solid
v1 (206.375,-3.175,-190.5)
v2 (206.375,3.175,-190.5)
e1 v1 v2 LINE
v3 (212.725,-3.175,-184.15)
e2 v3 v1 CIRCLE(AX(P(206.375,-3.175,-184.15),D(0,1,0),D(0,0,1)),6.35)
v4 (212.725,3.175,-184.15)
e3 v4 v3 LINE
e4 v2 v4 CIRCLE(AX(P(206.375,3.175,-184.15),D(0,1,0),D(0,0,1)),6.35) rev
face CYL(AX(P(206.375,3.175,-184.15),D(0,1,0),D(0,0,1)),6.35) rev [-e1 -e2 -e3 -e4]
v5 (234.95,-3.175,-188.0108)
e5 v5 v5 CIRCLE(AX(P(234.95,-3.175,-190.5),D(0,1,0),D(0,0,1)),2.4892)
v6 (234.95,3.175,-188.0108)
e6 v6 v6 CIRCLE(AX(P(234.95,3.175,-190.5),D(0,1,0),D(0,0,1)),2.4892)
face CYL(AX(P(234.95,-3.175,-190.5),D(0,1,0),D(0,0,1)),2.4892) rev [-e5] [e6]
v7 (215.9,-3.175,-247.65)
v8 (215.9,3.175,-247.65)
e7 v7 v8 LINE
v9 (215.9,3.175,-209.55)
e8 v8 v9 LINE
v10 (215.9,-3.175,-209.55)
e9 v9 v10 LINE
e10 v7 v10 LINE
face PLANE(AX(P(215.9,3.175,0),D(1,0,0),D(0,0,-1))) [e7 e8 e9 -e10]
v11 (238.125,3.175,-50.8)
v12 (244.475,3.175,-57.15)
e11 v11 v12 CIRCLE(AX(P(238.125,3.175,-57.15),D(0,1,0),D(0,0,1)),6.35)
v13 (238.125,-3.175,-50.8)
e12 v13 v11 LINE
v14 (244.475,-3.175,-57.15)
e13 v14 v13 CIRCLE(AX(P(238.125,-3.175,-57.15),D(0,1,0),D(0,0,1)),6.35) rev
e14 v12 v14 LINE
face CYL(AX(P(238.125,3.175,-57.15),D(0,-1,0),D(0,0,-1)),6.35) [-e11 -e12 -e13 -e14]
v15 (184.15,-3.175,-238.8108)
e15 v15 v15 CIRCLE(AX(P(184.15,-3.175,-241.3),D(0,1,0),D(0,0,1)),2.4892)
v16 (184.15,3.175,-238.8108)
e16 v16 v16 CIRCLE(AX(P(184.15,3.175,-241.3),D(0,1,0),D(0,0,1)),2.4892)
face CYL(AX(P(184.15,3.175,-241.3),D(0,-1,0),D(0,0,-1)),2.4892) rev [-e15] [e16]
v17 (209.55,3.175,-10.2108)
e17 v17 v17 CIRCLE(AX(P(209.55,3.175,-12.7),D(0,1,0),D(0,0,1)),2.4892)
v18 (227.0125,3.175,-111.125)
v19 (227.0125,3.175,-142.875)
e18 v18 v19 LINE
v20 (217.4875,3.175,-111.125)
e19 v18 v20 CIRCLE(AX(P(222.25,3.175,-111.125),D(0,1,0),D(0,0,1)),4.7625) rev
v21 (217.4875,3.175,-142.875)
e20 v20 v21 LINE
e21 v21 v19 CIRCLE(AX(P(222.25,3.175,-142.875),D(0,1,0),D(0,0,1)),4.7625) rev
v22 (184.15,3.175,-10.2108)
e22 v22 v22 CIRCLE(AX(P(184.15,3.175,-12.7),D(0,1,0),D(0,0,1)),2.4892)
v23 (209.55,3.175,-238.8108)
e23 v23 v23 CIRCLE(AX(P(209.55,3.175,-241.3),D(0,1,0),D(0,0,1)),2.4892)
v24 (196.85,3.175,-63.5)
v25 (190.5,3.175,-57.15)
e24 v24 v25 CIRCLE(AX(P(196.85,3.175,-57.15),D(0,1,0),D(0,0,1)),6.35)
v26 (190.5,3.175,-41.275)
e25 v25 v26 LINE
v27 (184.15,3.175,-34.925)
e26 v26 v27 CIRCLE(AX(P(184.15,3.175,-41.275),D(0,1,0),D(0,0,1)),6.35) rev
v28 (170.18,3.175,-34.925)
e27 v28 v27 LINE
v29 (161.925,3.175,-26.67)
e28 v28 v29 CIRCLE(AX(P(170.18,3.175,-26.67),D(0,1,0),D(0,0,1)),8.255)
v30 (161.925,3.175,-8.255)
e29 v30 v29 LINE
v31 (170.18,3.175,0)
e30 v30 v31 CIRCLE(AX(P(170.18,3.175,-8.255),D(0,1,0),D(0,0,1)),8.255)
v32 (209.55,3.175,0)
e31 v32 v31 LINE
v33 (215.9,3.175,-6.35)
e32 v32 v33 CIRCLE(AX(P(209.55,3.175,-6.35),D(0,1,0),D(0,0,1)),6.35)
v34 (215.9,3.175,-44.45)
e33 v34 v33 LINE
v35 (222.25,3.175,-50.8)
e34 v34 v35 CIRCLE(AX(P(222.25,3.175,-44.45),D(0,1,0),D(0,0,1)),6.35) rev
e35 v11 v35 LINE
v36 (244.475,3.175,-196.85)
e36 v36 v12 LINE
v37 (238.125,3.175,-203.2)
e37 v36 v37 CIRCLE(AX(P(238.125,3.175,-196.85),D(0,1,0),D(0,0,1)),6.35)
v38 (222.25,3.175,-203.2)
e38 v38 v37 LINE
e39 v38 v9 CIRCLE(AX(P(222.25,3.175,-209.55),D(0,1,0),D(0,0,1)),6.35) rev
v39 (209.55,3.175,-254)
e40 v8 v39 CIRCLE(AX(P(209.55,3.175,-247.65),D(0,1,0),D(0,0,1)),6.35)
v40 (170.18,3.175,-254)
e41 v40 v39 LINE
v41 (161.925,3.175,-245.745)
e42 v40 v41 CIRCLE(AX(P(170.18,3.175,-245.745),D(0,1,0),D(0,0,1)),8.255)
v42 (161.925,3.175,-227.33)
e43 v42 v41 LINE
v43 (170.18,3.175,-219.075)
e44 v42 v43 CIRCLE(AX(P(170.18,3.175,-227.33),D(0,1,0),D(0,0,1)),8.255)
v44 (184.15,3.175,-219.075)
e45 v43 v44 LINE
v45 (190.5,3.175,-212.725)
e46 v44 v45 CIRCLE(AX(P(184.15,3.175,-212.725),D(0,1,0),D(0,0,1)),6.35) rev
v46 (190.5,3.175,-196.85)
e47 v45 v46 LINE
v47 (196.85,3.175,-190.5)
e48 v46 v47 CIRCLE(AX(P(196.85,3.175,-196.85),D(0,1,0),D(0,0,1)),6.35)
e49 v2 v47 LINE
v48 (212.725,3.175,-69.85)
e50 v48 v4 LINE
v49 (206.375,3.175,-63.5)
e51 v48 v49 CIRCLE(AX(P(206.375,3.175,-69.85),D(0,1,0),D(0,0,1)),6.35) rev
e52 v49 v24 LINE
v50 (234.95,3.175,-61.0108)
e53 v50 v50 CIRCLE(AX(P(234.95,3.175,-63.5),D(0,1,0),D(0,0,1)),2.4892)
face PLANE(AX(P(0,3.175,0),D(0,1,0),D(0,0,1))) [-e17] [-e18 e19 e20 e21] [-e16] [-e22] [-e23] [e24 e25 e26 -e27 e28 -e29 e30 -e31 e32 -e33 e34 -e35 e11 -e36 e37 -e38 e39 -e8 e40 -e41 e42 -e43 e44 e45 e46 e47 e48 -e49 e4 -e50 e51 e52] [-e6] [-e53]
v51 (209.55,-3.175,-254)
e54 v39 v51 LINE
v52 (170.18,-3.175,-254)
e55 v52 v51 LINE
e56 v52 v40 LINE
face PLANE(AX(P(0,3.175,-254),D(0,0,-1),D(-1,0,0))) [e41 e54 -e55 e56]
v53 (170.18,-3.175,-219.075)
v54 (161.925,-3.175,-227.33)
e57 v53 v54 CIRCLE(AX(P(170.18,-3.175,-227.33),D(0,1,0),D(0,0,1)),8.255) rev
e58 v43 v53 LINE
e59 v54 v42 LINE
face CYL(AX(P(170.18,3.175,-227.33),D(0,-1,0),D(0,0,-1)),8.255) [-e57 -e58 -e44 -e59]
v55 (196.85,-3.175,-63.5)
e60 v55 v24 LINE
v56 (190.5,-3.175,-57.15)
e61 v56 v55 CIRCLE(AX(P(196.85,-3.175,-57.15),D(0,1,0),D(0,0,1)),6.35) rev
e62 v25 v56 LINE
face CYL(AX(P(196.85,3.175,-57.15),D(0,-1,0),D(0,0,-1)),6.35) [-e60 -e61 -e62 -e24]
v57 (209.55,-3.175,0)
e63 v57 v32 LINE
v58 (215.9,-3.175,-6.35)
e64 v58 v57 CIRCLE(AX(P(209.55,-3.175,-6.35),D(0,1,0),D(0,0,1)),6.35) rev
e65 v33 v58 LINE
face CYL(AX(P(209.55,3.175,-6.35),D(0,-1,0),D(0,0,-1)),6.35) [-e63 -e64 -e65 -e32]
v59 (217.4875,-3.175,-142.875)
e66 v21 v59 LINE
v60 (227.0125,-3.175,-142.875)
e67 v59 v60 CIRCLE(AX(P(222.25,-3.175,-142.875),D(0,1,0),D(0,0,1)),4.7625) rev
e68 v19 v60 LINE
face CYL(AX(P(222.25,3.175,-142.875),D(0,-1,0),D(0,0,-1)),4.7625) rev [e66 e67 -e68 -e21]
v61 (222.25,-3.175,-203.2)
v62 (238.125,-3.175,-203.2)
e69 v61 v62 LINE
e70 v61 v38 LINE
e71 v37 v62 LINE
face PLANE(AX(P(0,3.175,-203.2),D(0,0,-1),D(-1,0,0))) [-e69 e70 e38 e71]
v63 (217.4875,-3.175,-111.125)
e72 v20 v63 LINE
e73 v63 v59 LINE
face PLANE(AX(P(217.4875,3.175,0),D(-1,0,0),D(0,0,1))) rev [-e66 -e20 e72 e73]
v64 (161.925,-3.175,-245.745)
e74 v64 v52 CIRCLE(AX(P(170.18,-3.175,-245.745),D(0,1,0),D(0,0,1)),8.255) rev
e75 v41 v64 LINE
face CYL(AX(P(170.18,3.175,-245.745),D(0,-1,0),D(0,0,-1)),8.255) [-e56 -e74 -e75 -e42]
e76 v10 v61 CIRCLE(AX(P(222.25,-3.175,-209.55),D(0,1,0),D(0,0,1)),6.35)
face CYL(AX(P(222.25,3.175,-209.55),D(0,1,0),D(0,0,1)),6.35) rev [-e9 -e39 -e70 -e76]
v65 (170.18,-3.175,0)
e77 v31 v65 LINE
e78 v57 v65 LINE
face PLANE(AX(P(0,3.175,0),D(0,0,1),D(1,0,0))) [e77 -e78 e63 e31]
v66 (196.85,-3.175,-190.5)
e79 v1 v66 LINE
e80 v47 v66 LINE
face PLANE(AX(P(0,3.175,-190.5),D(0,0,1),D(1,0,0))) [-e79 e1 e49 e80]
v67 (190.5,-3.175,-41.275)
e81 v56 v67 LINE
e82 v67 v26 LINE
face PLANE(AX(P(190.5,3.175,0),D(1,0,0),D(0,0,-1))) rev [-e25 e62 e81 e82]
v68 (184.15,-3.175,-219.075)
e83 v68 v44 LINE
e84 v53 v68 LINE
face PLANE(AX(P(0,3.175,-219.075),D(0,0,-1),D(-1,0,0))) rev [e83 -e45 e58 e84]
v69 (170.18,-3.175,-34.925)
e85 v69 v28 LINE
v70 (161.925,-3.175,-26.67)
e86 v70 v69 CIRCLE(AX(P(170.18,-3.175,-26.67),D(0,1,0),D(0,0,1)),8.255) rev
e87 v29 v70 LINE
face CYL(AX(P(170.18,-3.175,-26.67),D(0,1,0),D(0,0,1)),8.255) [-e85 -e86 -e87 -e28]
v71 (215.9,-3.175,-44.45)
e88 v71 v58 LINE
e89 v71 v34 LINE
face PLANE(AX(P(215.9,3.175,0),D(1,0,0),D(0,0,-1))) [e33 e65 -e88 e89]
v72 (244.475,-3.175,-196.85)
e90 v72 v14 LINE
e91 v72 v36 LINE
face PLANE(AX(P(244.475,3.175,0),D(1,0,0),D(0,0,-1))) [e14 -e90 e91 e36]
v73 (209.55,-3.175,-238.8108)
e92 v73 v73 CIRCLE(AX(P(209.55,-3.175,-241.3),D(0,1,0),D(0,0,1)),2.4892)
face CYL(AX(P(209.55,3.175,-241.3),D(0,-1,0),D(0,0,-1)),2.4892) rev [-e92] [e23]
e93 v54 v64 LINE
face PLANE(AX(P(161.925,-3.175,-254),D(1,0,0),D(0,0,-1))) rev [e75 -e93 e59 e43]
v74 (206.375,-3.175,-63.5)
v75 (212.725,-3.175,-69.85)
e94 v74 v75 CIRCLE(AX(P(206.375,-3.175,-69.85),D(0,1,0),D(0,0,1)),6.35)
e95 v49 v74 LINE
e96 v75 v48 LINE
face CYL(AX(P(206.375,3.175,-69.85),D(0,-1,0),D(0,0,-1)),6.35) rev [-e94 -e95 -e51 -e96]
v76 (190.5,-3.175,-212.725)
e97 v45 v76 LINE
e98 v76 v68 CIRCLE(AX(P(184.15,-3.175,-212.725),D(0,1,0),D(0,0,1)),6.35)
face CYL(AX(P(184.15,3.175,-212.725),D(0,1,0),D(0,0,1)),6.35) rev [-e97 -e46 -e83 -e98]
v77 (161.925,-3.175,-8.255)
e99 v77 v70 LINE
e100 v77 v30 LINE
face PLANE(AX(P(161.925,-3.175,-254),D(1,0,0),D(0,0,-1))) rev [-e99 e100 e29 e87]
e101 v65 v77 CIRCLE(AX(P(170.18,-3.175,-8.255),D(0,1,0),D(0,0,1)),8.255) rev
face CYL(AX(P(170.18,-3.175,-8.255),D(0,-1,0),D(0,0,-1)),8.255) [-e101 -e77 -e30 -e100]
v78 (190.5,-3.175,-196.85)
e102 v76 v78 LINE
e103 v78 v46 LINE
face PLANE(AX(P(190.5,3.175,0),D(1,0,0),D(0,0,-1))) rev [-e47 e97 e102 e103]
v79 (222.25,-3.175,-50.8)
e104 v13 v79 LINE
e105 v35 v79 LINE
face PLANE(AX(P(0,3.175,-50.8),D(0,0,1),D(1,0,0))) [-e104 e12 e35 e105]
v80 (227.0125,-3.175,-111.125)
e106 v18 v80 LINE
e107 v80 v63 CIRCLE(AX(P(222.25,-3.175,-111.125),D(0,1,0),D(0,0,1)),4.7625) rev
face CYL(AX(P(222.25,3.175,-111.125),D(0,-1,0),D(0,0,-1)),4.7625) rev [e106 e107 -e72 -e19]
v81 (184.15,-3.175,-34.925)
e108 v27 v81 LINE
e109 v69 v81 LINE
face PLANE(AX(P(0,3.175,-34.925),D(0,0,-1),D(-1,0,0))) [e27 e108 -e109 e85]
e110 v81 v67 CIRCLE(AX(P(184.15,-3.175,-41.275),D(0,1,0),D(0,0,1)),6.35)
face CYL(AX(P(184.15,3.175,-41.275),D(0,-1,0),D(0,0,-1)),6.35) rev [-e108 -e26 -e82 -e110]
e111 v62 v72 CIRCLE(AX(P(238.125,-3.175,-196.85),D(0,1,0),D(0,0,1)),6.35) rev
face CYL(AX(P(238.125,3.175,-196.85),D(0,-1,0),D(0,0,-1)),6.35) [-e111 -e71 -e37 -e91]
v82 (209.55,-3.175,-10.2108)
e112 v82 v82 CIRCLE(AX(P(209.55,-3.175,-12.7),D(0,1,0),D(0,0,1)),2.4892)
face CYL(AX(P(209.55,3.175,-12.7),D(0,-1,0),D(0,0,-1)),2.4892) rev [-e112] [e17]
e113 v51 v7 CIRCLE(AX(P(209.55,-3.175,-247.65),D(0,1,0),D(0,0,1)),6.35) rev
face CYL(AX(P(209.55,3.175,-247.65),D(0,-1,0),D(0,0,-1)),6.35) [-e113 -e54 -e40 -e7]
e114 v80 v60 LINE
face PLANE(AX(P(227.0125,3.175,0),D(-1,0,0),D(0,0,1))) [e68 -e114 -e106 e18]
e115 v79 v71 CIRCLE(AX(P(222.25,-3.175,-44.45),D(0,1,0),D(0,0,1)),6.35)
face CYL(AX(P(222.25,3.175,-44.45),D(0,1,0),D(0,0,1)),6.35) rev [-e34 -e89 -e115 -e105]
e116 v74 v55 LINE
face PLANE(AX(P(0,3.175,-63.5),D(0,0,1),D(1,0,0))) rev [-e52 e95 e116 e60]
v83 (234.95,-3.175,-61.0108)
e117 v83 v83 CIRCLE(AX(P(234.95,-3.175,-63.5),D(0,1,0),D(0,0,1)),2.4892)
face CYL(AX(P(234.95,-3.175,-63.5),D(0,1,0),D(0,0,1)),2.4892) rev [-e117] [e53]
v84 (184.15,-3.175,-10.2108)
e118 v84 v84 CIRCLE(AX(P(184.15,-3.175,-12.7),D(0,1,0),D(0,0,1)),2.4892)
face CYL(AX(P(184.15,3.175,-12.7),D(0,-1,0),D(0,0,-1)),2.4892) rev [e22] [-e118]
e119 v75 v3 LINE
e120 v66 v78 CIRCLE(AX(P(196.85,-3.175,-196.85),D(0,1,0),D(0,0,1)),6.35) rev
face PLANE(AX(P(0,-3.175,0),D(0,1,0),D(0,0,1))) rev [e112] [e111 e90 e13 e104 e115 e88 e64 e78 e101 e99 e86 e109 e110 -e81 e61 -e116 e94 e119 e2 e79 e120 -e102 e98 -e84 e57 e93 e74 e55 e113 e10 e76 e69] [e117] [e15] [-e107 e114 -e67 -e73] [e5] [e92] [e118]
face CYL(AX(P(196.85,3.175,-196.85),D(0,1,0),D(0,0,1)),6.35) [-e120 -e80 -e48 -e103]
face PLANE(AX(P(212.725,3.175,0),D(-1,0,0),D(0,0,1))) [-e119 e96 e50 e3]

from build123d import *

# Parameters (mm, degrees)
SKETCH1_R           = 2.4892
BOSS_EXTRUDE1_DEPTH = 3.175
FILLET1_R           = 6.35
LPATTERN1_START     = -3.175
LPATTERN1_OUTLINE_R = 2.4892
LPATTERN1_DEPTH     = 6.35
SKETCH2_R           = 2.4892
SKETCH2_W           = 190.5
SKETCH2_H           = 254
CUT_EXTRUDE1_DEPTH  = 353.596579854
FILLET2_R           = 8.255


# Read off the part's stored shape, not the designer's step: LPattern1
with BuildPart() as part:
    # Sketch1 → Boss-Extrude1 (new, symmetric)
    with BuildSketch(Plane(origin=(0, 0, 0), x_dir=(1, 0, 0), z_dir=(0, 1, 0))):
        Polygon((0, 50.8), (0, 0), (215.9, 0), (215.9, 50.8), (244.475, 50.8), (244.475, 203.2), (215.9, 203.2), (215.9, 254), (0, 254), (0, 203.2), (-28.575, 203.2), (-28.575, 50.8), align=None)
        Polygon((12.7, 190.5), (12.7, 219.075), (190.5, 219.075), (190.5, 190.5), (212.725, 190.5), (212.725, 63.5), (190.5, 63.5), (190.5, 34.925), (12.7, 34.925), (12.7, 63.5), (-9.525, 63.5), (-9.525, 190.5), align=None, mode=Mode.SUBTRACT)
        with Locations(Location((209.55, 12.7, 0), (0, 0, 270))):
            Circle(SKETCH1_R, mode=Mode.SUBTRACT)
        with BuildLine():
            Line((227.0125, 142.875), (227.0125, 111.125))
            ThreePointArc((227.0125, 111.125), (222.25, 106.3625), (217.4875, 111.125))
            Line((217.4875, 111.125), (217.4875, 142.875))
            ThreePointArc((217.4875, 142.875), (222.25, 147.6375), (227.0125, 142.875))
        make_face(mode=Mode.SUBTRACT)
        with BuildLine():
            ThreePointArc((-14.2875, 111.125), (-19.05, 106.3625), (-23.8125, 111.125))
            Line((-23.8125, 111.125), (-23.8125, 142.875))
            ThreePointArc((-23.8125, 142.875), (-19.05, 147.6375), (-14.2875, 142.875))
            Line((-14.2875, 142.875), (-14.2875, 111.125))
        make_face(mode=Mode.SUBTRACT)
        with Locations(Location((209.55, 241.3, 0), (0, 0, 270))):
            Circle(SKETCH1_R, mode=Mode.SUBTRACT)
    extrude(amount=BOSS_EXTRUDE1_DEPTH, both=True)

    # Fillet1
    fillet1_edges = [part.edges().sort_by_distance(p)[0] for p in [
        (0, 0, 0),
        (0, 0, -50.8),
        (-28.575, 0, -50.8),
        (-28.575, 0, -203.2),
        (0, 0, -203.2),
        (0, 0, -254),
        (215.9, 0, -254),
        (215.9, 0, -203.2),
        (244.475, 0, -203.2),
        (244.475, 0, -50.8),
        (215.9, 0, -50.8),
        (215.9, 0, 0),
        (212.725, 0, -190.5),
        (190.5, 0, -190.5),
        (190.5, 0, -219.075),
        (12.7, 0, -219.075),
        (12.7, 0, -190.5),
        (-9.525, 0, -190.5),
        (-9.525, 0, -63.5),
        (12.7, 0, -63.5),
        (12.7, 0, -34.925),
        (190.5, 0, -34.925),
        (190.5, 0, -63.5),
        (212.725, 0, -63.5),
    ]]
    fillet(fillet1_edges, radius=FILLET1_R)

    # LPattern1 outline → LPattern1 (cut)
    with BuildSketch(Plane(origin=(0, 0, 0), x_dir=(1, 0, 0), z_dir=(0, 1, 0)).offset(LPATTERN1_START)):
        with Locations((31.75, 12.7)):
            Circle(LPATTERN1_OUTLINE_R)
        with Locations((31.75, 241.3)):
            Circle(LPATTERN1_OUTLINE_R)
        with Locations((57.15, 12.7)):
            Circle(LPATTERN1_OUTLINE_R)
        with Locations((57.15, 241.3)):
            Circle(LPATTERN1_OUTLINE_R)
        with Locations((82.55, 12.7)):
            Circle(LPATTERN1_OUTLINE_R)
        with Locations((82.55, 241.3)):
            Circle(LPATTERN1_OUTLINE_R)
        with Locations((107.95, 12.7)):
            Circle(LPATTERN1_OUTLINE_R)
        with Locations((107.95, 241.3)):
            Circle(LPATTERN1_OUTLINE_R)
        with Locations((133.35, 12.7)):
            Circle(LPATTERN1_OUTLINE_R)
        with Locations((133.35, 241.3)):
            Circle(LPATTERN1_OUTLINE_R)
        with Locations((158.75, 12.7)):
            Circle(LPATTERN1_OUTLINE_R)
        with Locations((158.75, 241.3)):
            Circle(LPATTERN1_OUTLINE_R)
        with Locations((184.15, 12.7)):
            Circle(LPATTERN1_OUTLINE_R)
        with Locations((184.15, 241.3)):
            Circle(LPATTERN1_OUTLINE_R)
    extrude(amount=LPATTERN1_DEPTH, mode=Mode.SUBTRACT)

    # Sketch2 → Cut-Extrude1 (cut, through all)
    with BuildSketch(Plane(origin=(0, 3.175, 0), x_dir=(1, 0, 0), z_dir=(0, 1, 0))):
        with Locations(Location((234.95, 190.5, 0), (0, 0, 270))):
            Circle(SKETCH2_R)
        with Locations(Location((234.95, 63.5, 0), (0, 0, 270))):
            Circle(SKETCH2_R)
        with Locations((66.675, 127)):
            Rectangle(SKETCH2_W, SKETCH2_H)
    extrude(amount=-CUT_EXTRUDE1_DEPTH, mode=Mode.SUBTRACT)

    # Fillet2
    fillet2_edges = [part.edges().sort_by_distance(p)[0] for p in [
        (161.925, 0, -34.925),
        (161.925, 0, -219.075),
        (161.925, 0, -254),
        (161.925, 0, 0),
    ]]
    fillet(fillet2_edges, radius=FILLET2_R)


solid = part.part
